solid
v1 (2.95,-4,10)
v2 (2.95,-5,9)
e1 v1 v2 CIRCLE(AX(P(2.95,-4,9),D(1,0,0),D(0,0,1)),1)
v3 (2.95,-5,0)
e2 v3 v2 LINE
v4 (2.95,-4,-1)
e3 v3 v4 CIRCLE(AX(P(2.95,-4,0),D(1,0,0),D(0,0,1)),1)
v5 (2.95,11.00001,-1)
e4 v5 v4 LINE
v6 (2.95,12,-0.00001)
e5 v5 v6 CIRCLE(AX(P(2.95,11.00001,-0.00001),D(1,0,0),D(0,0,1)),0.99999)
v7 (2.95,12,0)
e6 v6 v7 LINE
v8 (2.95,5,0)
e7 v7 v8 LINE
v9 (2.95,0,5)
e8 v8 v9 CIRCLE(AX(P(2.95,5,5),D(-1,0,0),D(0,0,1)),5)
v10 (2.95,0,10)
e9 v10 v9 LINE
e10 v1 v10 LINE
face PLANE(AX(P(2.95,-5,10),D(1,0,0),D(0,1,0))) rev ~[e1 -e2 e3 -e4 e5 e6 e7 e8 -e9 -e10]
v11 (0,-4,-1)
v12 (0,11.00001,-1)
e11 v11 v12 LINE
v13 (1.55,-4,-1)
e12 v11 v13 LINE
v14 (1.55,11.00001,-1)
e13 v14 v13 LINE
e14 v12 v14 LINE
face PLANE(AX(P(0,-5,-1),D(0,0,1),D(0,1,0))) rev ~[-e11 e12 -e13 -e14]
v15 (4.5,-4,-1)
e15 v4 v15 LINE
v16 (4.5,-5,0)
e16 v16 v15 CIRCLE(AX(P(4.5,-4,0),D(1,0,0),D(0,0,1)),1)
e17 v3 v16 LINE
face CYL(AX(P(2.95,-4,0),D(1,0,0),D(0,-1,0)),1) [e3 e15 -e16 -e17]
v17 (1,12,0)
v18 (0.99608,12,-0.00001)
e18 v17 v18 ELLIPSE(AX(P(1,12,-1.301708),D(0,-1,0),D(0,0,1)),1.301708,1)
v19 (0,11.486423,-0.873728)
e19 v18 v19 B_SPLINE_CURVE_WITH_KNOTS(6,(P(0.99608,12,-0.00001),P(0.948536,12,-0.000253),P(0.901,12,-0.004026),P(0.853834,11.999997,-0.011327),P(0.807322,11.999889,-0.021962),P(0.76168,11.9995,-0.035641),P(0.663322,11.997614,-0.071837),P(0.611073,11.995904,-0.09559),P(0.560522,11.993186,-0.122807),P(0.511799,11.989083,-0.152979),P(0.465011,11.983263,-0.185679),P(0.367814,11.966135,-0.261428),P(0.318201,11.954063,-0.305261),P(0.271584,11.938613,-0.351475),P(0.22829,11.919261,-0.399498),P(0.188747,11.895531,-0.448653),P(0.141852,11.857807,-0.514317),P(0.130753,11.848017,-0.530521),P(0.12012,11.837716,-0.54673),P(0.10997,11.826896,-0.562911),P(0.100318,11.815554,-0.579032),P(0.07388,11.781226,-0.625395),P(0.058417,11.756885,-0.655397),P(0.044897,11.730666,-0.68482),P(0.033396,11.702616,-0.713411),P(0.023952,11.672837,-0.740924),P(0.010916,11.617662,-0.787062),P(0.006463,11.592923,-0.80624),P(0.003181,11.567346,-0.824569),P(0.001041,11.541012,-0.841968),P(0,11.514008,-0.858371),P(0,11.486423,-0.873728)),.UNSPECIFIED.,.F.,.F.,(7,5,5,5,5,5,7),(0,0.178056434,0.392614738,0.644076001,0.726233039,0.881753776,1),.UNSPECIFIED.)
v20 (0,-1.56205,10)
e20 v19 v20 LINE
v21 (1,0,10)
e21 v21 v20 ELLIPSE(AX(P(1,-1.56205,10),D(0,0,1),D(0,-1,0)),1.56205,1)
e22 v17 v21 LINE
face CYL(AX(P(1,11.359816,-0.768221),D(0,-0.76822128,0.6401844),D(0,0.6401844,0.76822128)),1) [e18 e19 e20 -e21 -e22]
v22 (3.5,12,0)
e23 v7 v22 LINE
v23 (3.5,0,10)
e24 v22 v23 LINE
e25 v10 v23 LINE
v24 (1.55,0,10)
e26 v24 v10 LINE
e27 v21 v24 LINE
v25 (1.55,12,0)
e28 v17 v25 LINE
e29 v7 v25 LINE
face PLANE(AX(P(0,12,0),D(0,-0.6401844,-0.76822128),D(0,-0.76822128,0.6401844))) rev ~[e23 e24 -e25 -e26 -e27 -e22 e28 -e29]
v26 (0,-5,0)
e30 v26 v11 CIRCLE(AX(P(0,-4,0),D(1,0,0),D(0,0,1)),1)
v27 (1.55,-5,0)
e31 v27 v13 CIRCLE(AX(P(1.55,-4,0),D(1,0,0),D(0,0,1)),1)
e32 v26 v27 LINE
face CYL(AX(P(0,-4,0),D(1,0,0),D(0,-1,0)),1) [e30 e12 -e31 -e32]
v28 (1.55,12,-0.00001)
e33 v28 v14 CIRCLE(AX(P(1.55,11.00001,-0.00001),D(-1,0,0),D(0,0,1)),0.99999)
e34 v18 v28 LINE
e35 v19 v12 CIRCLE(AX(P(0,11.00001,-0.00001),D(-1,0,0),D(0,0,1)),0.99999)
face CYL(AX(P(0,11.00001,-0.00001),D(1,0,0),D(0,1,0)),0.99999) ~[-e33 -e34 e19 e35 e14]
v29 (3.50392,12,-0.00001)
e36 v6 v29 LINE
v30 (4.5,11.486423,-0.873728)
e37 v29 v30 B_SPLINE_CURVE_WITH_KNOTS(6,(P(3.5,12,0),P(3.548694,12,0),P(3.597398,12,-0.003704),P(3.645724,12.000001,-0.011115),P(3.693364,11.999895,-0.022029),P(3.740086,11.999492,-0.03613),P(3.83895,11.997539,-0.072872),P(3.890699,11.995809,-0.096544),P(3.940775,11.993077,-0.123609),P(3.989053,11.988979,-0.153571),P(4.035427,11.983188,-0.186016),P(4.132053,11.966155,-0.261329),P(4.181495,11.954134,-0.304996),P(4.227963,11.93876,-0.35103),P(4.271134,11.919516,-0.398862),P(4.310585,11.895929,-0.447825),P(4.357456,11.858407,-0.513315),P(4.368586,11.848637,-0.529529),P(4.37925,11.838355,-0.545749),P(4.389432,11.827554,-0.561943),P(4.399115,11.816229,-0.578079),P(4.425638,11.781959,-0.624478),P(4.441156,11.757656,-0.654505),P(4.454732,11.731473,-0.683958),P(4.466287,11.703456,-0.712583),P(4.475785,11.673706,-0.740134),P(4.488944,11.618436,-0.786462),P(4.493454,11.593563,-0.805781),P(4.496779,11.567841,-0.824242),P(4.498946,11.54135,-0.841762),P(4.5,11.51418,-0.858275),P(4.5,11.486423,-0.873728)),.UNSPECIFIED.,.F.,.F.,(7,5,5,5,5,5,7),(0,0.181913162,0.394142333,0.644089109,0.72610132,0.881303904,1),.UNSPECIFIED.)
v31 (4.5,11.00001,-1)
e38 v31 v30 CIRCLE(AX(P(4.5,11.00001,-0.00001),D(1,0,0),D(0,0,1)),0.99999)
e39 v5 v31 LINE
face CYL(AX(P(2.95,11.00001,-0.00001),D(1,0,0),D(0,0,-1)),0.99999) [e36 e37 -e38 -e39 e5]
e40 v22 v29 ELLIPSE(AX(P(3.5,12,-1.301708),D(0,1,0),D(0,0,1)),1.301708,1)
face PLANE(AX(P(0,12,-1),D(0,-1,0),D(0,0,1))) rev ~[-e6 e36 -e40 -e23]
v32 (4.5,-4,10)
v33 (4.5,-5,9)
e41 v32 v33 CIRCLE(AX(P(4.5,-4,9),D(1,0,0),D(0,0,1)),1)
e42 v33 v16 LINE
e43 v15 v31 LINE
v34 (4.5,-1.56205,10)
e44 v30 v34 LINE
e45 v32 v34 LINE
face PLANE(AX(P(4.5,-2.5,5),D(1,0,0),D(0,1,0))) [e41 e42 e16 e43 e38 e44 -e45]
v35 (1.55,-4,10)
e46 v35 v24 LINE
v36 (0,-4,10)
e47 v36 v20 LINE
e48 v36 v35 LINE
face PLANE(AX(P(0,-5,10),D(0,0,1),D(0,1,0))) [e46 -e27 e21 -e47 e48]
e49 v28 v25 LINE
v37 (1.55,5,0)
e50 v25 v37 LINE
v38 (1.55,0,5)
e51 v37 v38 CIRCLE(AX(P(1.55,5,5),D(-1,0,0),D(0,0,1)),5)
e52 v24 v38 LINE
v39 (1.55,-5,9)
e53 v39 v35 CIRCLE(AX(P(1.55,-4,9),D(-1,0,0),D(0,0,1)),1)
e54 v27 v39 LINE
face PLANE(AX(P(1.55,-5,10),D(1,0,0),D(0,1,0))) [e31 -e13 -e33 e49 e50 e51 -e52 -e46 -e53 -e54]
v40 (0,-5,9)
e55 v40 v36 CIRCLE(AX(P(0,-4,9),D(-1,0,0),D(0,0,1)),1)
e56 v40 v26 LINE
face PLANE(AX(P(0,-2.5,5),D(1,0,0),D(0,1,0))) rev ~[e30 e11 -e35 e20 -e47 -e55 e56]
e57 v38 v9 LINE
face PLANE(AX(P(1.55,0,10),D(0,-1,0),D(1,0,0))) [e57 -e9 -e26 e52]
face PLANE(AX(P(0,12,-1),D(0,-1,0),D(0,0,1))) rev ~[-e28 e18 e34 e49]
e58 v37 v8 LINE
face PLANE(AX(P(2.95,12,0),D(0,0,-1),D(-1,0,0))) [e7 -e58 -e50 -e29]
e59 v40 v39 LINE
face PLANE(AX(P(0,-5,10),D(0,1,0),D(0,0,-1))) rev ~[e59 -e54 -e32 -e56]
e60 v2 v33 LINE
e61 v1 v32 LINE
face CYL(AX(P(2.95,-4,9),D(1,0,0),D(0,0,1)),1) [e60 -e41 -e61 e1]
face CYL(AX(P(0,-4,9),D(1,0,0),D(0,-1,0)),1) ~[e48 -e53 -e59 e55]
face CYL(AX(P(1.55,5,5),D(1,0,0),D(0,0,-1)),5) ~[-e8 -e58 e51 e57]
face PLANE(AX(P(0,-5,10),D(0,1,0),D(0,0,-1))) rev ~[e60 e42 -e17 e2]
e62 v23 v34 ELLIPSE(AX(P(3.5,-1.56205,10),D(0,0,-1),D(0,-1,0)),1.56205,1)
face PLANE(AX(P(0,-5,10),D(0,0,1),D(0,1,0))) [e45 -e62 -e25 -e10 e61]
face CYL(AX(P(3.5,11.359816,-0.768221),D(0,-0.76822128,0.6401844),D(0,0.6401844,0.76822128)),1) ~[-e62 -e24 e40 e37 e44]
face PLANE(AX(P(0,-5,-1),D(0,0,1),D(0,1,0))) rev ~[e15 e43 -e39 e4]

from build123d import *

# Parameters (mm, degrees)
F0_W     = 5
F0_H     = 10
F1_DEPTH = 4.5
F2_W     = 1.4
F2_H     = 5
F3_DEPTH = 25
F4_W     = 1.4
F4_H     = 1
F5_DEPTH = 25
F6_R     = 0.99999
F6_R_2   = 1
F7_R     = 5


# Not quite as in the source:
# - a fillet or chamfer is up to 0.001 mm smaller than in the source, because OpenCascade refuses the exact size


with BuildPart() as f1:
    # F0 (on Right) → F1 (new body)
    with BuildSketch(Plane.YZ):
        with Locations((-2.5, 5)):
            Rectangle(F0_W, F0_H)
        Polygon((0, 10), (0, 0), (12, 0), align=None)
        Polygon((12, 0), (0, 0), (-5, 0), (-5, -1), (12, -1), align=None)
    extrude(amount=F1_DEPTH)

    # F2 (on face) → F3 (cut)
    with BuildSketch(Plane.XY.offset(10)):
        with Locations((2.25, -2.5)):
            Rectangle(F2_W, F2_H)
    extrude(amount=-F3_DEPTH, mode=Mode.SUBTRACT)

    # F4 (on face) → F5 (cut)
    with BuildSketch(Plane(origin=(0, 12, 0), x_dir=(-1, 0, 0), z_dir=(0, 1, 0))):
        with Locations((-2.25, -0.5)):
            Rectangle(F4_W, F4_H)
    extrude(amount=-F5_DEPTH, mode=Mode.SUBTRACT)

    # F6 (call 1 of 8: OpenCascade refuses the feature's edges together) (radius 1 in the source; OpenCascade refuses exactly that, so slightly less here)
    f6_edges = [f1.edges().sort_by_distance(p)[0] for p in [
        (3.725, 12, -1),
    ]]
    fillet(f6_edges, radius=F6_R)

    # F6#2 (call 2 of 8) (radius 1 in the source; OpenCascade refuses exactly that, so slightly less here)
    f6_2_edges = [f1.edges().sort_by_distance(p)[0] for p in [
        (0.775, 12, -1),
    ]]
    fillet(f6_2_edges, radius=F6_R)

    # F6#3 (call 3 of 8)
    f6_3_edges = [f1.edges().sort_by_distance(p)[0] for p in [
        (3.725, -5, -1),
    ]]
    fillet(f6_3_edges, radius=F6_R_2)

    # F6#4 (call 4 of 8)
    f6_4_edges = [f1.edges().sort_by_distance(p)[0] for p in [
        (0.775, -5, -1),
    ]]
    fillet(f6_4_edges, radius=F6_R_2)

    # F6#5 (call 5 of 8)
    f6_5_edges = [f1.edges().sort_by_distance(p)[0] for p in [
        (0.775, -5, 10),
    ]]
    fillet(f6_5_edges, radius=F6_R_2)

    # F6#6 (call 6 of 8)
    f6_6_edges = [f1.edges().sort_by_distance(p)[0] for p in [
        (3.725, -5, 10),
    ]]
    fillet(f6_6_edges, radius=F6_R_2)

    # F6#7 (call 7 of 8)
    f6_7_edges = [f1.edges().sort_by_distance(p)[0] for p in [
        (0, 6, 5),
    ]]
    fillet(f6_7_edges, radius=F6_R_2)

    # F6#8 (call 8 of 8)
    f6_8_edges = [f1.edges().sort_by_distance(p)[0] for p in [
        (4.5, 6, 5),
    ]]
    fillet(f6_8_edges, radius=F6_R_2)

    # F7
    f7_edges = [f1.edges().sort_by_distance(p)[0] for p in [
        (2.25, 0, 0),
    ]]
    fillet(f7_edges, radius=F7_R)


solid = f1.part
